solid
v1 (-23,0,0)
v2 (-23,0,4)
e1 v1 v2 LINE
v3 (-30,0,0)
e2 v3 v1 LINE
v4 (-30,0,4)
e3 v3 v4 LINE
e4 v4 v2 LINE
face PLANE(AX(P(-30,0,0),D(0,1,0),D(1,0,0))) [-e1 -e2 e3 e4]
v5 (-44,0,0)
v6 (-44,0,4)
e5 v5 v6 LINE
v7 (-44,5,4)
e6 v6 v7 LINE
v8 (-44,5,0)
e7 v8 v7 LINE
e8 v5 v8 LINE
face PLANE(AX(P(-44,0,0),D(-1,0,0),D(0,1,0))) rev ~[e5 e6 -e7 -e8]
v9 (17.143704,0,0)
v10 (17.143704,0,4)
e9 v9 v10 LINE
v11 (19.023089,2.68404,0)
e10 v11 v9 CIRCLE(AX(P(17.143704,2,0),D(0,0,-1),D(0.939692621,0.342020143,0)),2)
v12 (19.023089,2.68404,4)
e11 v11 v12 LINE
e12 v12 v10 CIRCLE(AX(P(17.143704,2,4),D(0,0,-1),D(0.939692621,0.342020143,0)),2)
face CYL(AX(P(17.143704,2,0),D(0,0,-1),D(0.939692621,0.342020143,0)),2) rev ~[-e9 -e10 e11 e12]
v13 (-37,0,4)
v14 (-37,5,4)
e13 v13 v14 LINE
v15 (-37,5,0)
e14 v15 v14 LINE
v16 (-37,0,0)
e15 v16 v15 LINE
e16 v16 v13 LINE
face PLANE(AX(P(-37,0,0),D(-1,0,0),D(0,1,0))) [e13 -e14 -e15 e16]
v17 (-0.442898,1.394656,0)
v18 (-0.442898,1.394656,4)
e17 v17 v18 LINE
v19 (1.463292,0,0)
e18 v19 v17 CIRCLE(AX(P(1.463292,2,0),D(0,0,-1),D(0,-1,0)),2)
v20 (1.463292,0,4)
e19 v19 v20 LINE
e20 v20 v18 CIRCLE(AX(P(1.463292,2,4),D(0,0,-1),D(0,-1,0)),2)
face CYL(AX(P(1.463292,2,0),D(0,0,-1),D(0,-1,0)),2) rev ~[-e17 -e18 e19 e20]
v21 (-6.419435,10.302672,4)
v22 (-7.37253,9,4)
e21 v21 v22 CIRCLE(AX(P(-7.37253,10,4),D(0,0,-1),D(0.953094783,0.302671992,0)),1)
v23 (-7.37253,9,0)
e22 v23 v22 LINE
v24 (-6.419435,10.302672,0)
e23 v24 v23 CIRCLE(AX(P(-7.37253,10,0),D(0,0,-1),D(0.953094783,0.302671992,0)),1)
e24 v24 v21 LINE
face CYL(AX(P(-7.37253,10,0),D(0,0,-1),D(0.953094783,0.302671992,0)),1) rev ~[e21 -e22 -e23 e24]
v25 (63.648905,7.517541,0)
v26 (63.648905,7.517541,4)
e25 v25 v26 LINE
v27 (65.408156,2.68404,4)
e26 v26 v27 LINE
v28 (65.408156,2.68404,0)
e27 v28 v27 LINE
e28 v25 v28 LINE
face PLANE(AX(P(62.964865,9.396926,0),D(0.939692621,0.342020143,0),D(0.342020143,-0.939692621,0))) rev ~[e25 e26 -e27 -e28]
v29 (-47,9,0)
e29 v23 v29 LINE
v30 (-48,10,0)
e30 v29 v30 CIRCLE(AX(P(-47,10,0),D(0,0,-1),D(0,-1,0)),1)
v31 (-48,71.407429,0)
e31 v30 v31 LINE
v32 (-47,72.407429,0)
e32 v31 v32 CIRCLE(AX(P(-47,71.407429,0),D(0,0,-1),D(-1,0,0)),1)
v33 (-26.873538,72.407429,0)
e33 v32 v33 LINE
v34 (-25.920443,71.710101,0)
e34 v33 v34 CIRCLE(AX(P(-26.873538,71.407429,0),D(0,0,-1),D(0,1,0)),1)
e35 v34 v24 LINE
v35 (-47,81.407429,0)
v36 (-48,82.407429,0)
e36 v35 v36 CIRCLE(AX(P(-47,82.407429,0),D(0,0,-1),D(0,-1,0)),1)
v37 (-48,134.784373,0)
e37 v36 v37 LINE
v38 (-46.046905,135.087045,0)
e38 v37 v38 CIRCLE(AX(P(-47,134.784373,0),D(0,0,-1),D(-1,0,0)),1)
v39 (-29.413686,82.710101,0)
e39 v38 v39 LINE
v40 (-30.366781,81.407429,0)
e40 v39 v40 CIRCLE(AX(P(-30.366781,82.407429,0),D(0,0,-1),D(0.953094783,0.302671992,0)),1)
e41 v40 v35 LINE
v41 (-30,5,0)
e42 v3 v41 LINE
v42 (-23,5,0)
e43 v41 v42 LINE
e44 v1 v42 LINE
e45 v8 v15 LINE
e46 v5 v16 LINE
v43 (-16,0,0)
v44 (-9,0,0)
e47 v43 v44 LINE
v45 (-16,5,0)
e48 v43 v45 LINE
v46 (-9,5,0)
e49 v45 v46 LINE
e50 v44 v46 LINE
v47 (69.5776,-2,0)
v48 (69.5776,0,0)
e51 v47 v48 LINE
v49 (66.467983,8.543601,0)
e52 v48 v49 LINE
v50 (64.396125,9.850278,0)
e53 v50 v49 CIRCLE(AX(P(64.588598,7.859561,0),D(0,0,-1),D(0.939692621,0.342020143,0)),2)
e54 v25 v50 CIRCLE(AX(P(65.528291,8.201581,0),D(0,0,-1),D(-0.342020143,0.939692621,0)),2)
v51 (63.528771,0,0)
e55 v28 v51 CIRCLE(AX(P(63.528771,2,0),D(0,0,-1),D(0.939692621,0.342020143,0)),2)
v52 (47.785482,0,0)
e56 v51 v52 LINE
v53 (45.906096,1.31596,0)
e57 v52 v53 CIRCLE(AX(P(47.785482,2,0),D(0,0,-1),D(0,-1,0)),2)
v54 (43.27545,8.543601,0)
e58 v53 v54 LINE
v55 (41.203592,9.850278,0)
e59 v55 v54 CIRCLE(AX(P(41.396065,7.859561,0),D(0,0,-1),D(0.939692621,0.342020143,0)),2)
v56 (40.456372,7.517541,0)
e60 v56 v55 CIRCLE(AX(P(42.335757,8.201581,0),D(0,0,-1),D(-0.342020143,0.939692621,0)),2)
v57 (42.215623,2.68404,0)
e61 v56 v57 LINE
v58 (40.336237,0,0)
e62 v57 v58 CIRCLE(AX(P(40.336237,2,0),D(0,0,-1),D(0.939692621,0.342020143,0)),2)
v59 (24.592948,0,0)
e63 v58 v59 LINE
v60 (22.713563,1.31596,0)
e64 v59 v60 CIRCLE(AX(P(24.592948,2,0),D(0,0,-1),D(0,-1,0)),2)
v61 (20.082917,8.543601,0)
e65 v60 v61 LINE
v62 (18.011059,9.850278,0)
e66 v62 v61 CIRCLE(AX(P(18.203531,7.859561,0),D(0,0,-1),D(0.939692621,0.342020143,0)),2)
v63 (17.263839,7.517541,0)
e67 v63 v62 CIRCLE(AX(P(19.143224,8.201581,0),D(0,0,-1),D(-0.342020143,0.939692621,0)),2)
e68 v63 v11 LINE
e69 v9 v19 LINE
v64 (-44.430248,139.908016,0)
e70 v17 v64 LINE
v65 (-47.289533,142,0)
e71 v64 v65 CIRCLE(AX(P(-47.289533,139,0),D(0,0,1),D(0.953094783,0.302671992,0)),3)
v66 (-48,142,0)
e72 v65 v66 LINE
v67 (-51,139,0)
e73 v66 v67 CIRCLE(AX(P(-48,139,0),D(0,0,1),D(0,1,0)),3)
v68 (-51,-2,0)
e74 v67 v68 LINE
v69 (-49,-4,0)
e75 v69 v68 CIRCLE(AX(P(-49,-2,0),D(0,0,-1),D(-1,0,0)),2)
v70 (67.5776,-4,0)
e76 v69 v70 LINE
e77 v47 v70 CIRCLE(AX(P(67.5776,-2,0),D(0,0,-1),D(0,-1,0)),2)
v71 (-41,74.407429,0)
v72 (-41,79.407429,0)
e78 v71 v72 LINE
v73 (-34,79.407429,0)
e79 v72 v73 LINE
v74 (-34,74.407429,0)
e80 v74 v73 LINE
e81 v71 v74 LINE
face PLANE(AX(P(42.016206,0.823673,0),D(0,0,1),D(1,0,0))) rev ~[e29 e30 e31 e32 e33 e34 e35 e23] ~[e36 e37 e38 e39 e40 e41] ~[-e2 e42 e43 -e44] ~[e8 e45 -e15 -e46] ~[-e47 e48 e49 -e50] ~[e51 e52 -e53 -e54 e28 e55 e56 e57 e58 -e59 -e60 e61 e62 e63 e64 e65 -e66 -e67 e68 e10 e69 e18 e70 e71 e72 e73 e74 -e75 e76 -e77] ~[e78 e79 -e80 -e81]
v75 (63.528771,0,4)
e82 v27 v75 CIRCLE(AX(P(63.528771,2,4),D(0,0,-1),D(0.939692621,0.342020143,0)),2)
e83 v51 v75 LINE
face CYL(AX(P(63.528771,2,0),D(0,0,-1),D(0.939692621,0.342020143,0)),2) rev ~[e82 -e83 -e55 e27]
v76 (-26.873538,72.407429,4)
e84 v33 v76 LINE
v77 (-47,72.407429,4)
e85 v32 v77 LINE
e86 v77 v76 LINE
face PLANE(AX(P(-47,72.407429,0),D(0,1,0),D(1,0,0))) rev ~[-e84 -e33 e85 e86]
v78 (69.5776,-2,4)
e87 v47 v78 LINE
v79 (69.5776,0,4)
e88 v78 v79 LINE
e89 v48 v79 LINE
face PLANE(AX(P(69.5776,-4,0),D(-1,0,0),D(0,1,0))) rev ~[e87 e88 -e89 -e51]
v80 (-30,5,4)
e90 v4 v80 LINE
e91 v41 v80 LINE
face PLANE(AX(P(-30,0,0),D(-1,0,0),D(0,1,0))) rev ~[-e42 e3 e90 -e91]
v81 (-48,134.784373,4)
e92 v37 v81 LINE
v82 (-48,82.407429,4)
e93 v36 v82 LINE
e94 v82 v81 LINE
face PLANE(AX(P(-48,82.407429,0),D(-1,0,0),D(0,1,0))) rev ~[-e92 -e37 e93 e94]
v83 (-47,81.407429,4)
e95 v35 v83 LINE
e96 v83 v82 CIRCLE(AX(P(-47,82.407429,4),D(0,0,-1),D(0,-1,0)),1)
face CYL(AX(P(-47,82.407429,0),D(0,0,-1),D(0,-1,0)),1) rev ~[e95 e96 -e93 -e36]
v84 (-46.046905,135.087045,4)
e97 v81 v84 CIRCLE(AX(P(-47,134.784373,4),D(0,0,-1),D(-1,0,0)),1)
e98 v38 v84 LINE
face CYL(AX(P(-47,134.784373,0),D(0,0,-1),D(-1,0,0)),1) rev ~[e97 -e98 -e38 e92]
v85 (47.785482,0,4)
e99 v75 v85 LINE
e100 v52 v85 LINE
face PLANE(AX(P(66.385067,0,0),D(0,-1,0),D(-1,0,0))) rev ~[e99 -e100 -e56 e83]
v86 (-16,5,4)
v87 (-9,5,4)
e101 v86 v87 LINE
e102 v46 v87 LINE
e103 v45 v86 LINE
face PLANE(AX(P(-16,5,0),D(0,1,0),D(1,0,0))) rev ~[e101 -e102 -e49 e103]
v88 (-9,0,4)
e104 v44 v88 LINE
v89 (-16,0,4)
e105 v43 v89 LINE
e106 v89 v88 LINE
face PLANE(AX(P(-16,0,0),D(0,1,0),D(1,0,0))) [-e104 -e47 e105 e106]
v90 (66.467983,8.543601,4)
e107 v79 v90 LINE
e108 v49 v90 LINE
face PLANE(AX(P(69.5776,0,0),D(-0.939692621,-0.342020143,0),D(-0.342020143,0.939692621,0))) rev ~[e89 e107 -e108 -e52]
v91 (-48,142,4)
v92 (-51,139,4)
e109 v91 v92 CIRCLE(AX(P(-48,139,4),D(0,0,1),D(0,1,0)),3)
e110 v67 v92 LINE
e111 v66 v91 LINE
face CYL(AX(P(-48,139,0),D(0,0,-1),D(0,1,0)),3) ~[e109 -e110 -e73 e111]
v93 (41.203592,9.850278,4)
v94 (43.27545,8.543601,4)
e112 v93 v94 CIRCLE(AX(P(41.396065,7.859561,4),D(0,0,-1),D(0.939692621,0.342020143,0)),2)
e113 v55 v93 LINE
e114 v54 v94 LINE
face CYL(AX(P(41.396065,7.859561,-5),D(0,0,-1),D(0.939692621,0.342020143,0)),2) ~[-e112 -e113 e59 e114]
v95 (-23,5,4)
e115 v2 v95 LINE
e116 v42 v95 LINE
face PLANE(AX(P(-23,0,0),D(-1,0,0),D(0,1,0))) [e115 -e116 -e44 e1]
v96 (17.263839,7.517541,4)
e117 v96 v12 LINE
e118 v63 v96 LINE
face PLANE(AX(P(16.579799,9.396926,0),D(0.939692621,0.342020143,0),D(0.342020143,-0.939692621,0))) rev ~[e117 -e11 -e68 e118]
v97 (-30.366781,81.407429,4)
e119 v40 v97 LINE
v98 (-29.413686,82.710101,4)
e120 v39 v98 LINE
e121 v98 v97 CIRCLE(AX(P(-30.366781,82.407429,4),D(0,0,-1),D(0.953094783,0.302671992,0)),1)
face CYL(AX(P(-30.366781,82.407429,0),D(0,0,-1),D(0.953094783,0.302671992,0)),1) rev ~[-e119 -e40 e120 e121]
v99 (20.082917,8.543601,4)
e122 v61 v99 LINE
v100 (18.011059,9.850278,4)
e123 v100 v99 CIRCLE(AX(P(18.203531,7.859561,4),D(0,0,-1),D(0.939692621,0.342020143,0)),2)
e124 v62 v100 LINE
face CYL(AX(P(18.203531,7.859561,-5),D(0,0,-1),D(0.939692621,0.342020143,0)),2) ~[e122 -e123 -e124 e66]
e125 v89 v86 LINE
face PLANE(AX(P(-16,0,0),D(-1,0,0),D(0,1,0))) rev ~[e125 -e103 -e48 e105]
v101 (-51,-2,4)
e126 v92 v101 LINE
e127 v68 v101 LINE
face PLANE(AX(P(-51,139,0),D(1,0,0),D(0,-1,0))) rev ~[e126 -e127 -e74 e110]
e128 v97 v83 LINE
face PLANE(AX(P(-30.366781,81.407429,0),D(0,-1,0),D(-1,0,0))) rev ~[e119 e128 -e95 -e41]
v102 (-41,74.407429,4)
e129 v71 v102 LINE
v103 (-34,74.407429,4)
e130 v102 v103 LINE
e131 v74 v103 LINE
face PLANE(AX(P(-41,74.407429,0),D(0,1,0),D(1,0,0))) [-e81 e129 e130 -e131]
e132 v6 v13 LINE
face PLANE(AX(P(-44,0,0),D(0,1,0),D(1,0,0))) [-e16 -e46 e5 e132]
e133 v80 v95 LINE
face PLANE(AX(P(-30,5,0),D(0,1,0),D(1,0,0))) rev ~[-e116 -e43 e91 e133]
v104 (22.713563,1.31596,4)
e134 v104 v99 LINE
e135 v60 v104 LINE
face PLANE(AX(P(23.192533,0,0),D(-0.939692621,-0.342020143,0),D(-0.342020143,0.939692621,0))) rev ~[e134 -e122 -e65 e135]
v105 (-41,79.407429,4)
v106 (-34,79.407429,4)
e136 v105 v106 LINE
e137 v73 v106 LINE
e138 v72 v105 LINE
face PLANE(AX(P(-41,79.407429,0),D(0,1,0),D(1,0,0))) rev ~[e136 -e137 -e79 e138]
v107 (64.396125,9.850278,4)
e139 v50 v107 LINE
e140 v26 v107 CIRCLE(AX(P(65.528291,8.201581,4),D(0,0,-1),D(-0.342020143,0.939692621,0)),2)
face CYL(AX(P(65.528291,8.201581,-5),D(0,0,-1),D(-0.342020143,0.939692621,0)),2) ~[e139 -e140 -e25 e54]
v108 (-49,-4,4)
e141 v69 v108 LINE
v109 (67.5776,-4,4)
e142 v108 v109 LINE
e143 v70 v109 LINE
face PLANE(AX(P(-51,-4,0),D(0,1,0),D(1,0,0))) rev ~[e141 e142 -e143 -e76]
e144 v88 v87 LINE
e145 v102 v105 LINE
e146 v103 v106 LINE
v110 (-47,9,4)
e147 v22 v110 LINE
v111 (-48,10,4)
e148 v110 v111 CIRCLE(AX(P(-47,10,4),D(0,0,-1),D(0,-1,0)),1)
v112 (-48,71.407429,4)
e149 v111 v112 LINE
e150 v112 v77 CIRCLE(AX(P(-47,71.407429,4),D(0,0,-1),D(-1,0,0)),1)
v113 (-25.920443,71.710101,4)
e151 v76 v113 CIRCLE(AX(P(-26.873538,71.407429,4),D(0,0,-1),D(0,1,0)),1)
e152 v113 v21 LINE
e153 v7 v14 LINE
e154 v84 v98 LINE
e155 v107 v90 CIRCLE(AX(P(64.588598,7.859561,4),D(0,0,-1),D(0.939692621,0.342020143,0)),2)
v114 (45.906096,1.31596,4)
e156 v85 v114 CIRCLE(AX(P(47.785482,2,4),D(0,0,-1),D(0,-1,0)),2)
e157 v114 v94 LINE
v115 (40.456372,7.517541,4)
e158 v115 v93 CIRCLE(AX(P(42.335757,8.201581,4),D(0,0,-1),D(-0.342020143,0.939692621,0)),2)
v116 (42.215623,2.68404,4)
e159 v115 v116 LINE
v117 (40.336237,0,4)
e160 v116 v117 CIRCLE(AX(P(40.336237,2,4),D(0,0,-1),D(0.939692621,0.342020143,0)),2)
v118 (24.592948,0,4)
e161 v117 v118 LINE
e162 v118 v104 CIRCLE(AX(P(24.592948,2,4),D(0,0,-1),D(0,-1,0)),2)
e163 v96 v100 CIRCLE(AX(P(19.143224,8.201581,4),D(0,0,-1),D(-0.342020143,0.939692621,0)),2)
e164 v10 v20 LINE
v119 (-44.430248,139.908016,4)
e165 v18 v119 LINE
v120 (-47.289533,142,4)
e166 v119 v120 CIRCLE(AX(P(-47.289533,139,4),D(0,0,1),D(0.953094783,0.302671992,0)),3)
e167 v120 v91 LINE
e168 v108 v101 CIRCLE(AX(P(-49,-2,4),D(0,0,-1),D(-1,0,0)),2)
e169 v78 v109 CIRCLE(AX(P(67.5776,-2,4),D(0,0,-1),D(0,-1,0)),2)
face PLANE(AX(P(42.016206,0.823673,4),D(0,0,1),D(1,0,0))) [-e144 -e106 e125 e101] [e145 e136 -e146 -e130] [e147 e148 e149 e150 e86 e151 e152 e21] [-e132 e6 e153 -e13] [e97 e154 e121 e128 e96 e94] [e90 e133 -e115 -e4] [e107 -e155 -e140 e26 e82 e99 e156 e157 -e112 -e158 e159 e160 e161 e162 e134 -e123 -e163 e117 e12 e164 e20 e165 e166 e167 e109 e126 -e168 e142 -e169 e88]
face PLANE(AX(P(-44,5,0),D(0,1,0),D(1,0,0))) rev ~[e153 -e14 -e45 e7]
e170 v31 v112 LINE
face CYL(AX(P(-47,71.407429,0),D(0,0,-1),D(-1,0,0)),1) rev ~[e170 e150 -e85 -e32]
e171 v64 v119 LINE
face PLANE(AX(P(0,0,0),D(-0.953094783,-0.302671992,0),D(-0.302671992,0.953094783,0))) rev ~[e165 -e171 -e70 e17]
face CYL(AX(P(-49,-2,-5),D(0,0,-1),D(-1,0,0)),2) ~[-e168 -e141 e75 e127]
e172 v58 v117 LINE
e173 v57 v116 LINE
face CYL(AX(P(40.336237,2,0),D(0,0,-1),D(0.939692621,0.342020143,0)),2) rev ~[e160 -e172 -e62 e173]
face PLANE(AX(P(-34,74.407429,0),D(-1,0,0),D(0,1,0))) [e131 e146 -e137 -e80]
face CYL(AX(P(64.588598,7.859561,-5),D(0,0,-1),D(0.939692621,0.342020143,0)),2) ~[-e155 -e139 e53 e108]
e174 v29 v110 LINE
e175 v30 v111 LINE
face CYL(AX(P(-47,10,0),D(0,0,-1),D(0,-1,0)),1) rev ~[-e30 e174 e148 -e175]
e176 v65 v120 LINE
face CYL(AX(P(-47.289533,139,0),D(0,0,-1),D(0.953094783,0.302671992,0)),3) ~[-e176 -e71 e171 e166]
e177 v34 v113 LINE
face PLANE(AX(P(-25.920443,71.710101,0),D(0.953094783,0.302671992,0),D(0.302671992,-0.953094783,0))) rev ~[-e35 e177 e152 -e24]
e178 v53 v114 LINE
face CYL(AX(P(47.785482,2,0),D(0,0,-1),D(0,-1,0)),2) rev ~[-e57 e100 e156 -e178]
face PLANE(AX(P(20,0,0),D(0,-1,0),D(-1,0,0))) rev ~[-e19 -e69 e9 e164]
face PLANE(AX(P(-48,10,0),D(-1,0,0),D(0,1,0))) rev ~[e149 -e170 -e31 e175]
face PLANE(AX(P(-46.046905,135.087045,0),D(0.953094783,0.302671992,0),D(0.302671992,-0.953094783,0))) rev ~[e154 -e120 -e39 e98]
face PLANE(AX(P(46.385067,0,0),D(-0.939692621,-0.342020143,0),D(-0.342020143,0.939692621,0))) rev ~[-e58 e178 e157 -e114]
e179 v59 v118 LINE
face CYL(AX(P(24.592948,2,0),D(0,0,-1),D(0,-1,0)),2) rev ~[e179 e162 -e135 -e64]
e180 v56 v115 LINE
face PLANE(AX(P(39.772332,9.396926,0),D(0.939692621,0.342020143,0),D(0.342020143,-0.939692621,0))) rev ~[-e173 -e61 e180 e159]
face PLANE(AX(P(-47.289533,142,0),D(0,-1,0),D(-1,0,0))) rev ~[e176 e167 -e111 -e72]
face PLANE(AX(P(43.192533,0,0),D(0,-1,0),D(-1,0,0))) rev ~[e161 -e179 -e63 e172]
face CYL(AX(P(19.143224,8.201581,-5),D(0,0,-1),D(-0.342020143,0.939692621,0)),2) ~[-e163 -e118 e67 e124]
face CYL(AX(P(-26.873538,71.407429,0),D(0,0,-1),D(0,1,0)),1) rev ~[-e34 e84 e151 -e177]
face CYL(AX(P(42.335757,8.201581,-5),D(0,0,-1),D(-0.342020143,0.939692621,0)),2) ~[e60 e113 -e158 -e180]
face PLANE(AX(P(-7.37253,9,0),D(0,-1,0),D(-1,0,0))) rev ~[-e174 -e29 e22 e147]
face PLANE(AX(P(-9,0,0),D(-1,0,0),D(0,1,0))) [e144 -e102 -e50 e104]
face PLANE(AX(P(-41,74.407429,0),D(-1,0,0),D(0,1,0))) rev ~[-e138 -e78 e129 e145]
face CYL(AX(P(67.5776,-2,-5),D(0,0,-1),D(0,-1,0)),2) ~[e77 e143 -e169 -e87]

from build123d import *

# Parameters (mm, degrees)
F0_W        = 7
F0_H        = 5
F1_DEPTH    = 4
F2_T1_DEPTH = 4
F2_T3_DEPTH = 14


# Not quite as in the source:
# - a fillet or chamfer that OpenCascade refuses, or shapes differently, is made with other operations: its cross-section is extruded or revolved along the edge and cut away or added
# - a feature names something its author has since deleted; it is built from what else it names


with BuildPart() as f1:
    # F0 (on Top) → F1 (new body)
    with BuildSketch(Plane.XY):
        with BuildLine():
            Line((-51, 139), (-51, -4))
            Line((-51, -4), (69.5775999523, -4))
            Line((69.5775999523, -4), (69.5775999523, 0))
            Line((69.5775999523, 0), (66.3850666349, 0))
            Line((66.3850666349, 0), (46.3850666349, 0))
            Line((46.3850666349, 0), (43.1925333174, 0))
            Line((43.1925333174, 0), (23.1925333174, 0))
            Line((23.1925333174, 0), (20, 0))
            Line((20, 0), (0, 0))
            Line((0, 0), (-44.4302483166, 139.9080159757))
            ThreePointArc((-44.4302483166, 139.9080159757), (-45.5180993372, 141.4211616971), (-47.2895326655, 142))
            Line((-47.2895326655, 142), (-48, 142))
            ThreePointArc((-48, 142), (-50.1213203436, 141.1213203436), (-51, 139))
        make_face()
        with Locations((-40.5, 2.5)):
            Rectangle(F0_W, F0_H, mode=Mode.SUBTRACT)
        with Locations((-26.5, 2.5)):
            Rectangle(F0_W, F0_H, mode=Mode.SUBTRACT)
        with Locations((-12.5, 2.5)):
            Rectangle(F0_W, F0_H, mode=Mode.SUBTRACT)
        with BuildLine():
            Line((-7.3725300405, 9), (-47, 9))
            ThreePointArc((-47, 9), (-47.7071067812, 9.2928932188), (-48, 10))
            Line((-48, 10), (-48, 71.4074290533))
            ThreePointArc((-48, 71.4074290533), (-47.7071067812, 72.1145358345), (-47, 72.4074290533))
            Line((-47, 72.4074290533), (-26.8735379155, 72.4074290533))
            ThreePointArc((-26.8735379155, 72.4074290533), (-26.2830601394, 72.2144829523), (-25.9204431326, 71.7101010452))
            Line((-25.9204431326, 71.7101010452), (-6.4194352575, 10.3026719919))
            ThreePointArc((-6.4194352575, 10.3026719919), (-6.5654761415, 9.4095222239), (-7.3725300405, 9))
        make_face(mode=Mode.SUBTRACT)
        with Locations((-37.5, 76.9074290533)):
            Rectangle(F0_W, F0_H, mode=Mode.SUBTRACT)
        with BuildLine():
            ThreePointArc((-48, 134.7843734895), (-47.1531424452, 135.7725776139), (-46.046905217, 135.0870454814))
            Line((-46.046905217, 135.0870454814), (-29.4136863758, 82.7101010452))
            ThreePointArc((-29.4136863758, 82.7101010452), (-29.5597272597, 81.8169512772), (-30.3667811588, 81.4074290533))
            Line((-30.3667811588, 81.4074290533), (-47, 81.4074290533))
            ThreePointArc((-47, 81.4074290533), (-47.7071067812, 81.7003222721), (-48, 82.4074290533))
            Line((-48, 82.4074290533), (-48, 134.7843734895))
        make_face(mode=Mode.SUBTRACT)
        Polygon((66.3850666349, 0), (69.5775999523, 0), (65.783943064, 10.4229866378), (62.9648652016, 9.3969262079), align=None)
        Polygon((43.1925333174, 0), (46.3850666349, 0), (42.5914097465, 10.4229866378), (39.7723318842, 9.3969262079), align=None)
        Polygon((16.5797985667, 9.3969262079), (20, 0), (23.1925333174, 0), (19.3988764291, 10.4229866378), align=None)
    extrude(amount=F1_DEPTH)

    # F2: fillet of radius 2 on 14 edges, made by hand

    # F2_s2 → F2_t1 (join)
    with BuildSketch(Plane.XY):
        with BuildLine():
            ThreePointArc((42.2156225455, 2.6840402867), (41.9745413925, 0.8528471273), (40.3362373039, 0))
            Line((40.3362373039, 0), (43.1925333174, 0))
            Line((43.1925333174, 0), (42.2156225455, 2.6840402867))
        make_face()
        with BuildLine():
            ThreePointArc((47.7854817113, 0), (46.6383288386, 0.3616959114), (45.9060964697, 1.3159597133))
            Line((45.9060964697, 1.3159597133), (46.3850666349, 0))
            Line((46.3850666349, 0), (47.7854817113, 0))
        make_face()
        with BuildLine():
            ThreePointArc((65.4081558629, 2.6840402867), (65.1670747099, 0.8528471273), (63.5287706214, 0))
            Line((63.5287706214, 0), (66.3850666349, 0))
            Line((66.3850666349, 0), (65.4081558629, 2.6840402867))
        make_face()
        with BuildLine():
            ThreePointArc((24.5929483938, 0), (23.4457955211, 0.3616959114), (22.7135631523, 1.3159597133))
            Line((22.7135631523, 1.3159597133), (23.1925333174, 0))
            Line((23.1925333174, 0), (24.5929483938, 0))
        make_face()
        with BuildLine():
            ThreePointArc((19.0230892281, 2.6840402867), (18.7820080751, 0.8528471273), (17.1437039865, 0))
            Line((17.1437039865, 0), (20, 0))
            Line((20, 0), (19.0230892281, 2.6840402867))
        make_face()
        with BuildLine():
            ThreePointArc((1.4632920473, 0), (0.2823364951, 0.3858922019), (-0.4428975187, 1.3946560162))
            Line((-0.4428975187, 1.3946560162), (0, 0))
            Line((0, 0), (1.4632920473, 0))
        make_face()
    extrude(amount=F2_T1_DEPTH)

    # F2_s4 → F2_t3 (cut)
    with BuildSketch(Plane.XY.offset(-5)):
        with BuildLine():
            ThreePointArc((66.4679833506, 8.5436013963), (65.4338346325, 9.6721766837), (63.9045578224, 9.7389463512))
            Line((63.9045578224, 9.7389463512), (65.783943064, 10.4229866378))
            Line((65.783943064, 10.4229866378), (66.4679833506, 8.5436013963))
        make_face()
        with BuildLine():
            ThreePointArc((64.8442504432, 10.0809664945), (63.7156751557, 9.0468177764), (63.6489054883, 7.5175409663))
            Line((63.6489054883, 7.5175409663), (62.9648652016, 9.3969262079))
            Line((62.9648652016, 9.3969262079), (64.8442504432, 10.0809664945))
        make_face()
        with BuildLine():
            ThreePointArc((20.0829167158, 8.5436013963), (19.0487679977, 9.6721766837), (17.5194911875, 9.7389463512))
            Line((17.5194911875, 9.7389463512), (19.3988764291, 10.4229866378))
            Line((19.3988764291, 10.4229866378), (20.0829167158, 8.5436013963))
        make_face()
        with BuildLine():
            ThreePointArc((18.4591838083, 10.0809664945), (17.3306085209, 9.0468177764), (17.2638388534, 7.5175409663))
            Line((17.2638388534, 7.5175409663), (16.5797985667, 9.3969262079))
            Line((16.5797985667, 9.3969262079), (18.4591838083, 10.0809664945))
        make_face()
        with BuildLine():
            ThreePointArc((41.6517171257, 10.0809664945), (40.5231418383, 9.0468177764), (40.4563721708, 7.5175409663))
            Line((40.4563721708, 7.5175409663), (39.7723318842, 9.3969262079))
            Line((39.7723318842, 9.3969262079), (41.6517171257, 10.0809664945))
        make_face()
        with BuildLine():
            ThreePointArc((43.2754500332, 8.5436013963), (42.2413013151, 9.6721766837), (40.712024505, 9.7389463512))
            Line((40.712024505, 9.7389463512), (42.5914097465, 10.4229866378))
            Line((42.5914097465, 10.4229866378), (43.2754500332, 8.5436013963))
        make_face()
        with BuildLine():
            ThreePointArc((67.5775999523, -4), (68.9918135147, -3.4142135624), (69.5775999523, -2))
            Line((69.5775999523, -2), (69.5775999523, -4))
            Line((69.5775999523, -4), (67.5775999523, -4))
        make_face()
        with BuildLine():
            ThreePointArc((-51, -2), (-50.4142135624, -3.4142135624), (-49, -4))
            Line((-49, -4), (-51, -4))
            Line((-51, -4), (-51, -2))
        make_face()
    extrude(amount=F2_T3_DEPTH, mode=Mode.SUBTRACT)


solid = f1.part
